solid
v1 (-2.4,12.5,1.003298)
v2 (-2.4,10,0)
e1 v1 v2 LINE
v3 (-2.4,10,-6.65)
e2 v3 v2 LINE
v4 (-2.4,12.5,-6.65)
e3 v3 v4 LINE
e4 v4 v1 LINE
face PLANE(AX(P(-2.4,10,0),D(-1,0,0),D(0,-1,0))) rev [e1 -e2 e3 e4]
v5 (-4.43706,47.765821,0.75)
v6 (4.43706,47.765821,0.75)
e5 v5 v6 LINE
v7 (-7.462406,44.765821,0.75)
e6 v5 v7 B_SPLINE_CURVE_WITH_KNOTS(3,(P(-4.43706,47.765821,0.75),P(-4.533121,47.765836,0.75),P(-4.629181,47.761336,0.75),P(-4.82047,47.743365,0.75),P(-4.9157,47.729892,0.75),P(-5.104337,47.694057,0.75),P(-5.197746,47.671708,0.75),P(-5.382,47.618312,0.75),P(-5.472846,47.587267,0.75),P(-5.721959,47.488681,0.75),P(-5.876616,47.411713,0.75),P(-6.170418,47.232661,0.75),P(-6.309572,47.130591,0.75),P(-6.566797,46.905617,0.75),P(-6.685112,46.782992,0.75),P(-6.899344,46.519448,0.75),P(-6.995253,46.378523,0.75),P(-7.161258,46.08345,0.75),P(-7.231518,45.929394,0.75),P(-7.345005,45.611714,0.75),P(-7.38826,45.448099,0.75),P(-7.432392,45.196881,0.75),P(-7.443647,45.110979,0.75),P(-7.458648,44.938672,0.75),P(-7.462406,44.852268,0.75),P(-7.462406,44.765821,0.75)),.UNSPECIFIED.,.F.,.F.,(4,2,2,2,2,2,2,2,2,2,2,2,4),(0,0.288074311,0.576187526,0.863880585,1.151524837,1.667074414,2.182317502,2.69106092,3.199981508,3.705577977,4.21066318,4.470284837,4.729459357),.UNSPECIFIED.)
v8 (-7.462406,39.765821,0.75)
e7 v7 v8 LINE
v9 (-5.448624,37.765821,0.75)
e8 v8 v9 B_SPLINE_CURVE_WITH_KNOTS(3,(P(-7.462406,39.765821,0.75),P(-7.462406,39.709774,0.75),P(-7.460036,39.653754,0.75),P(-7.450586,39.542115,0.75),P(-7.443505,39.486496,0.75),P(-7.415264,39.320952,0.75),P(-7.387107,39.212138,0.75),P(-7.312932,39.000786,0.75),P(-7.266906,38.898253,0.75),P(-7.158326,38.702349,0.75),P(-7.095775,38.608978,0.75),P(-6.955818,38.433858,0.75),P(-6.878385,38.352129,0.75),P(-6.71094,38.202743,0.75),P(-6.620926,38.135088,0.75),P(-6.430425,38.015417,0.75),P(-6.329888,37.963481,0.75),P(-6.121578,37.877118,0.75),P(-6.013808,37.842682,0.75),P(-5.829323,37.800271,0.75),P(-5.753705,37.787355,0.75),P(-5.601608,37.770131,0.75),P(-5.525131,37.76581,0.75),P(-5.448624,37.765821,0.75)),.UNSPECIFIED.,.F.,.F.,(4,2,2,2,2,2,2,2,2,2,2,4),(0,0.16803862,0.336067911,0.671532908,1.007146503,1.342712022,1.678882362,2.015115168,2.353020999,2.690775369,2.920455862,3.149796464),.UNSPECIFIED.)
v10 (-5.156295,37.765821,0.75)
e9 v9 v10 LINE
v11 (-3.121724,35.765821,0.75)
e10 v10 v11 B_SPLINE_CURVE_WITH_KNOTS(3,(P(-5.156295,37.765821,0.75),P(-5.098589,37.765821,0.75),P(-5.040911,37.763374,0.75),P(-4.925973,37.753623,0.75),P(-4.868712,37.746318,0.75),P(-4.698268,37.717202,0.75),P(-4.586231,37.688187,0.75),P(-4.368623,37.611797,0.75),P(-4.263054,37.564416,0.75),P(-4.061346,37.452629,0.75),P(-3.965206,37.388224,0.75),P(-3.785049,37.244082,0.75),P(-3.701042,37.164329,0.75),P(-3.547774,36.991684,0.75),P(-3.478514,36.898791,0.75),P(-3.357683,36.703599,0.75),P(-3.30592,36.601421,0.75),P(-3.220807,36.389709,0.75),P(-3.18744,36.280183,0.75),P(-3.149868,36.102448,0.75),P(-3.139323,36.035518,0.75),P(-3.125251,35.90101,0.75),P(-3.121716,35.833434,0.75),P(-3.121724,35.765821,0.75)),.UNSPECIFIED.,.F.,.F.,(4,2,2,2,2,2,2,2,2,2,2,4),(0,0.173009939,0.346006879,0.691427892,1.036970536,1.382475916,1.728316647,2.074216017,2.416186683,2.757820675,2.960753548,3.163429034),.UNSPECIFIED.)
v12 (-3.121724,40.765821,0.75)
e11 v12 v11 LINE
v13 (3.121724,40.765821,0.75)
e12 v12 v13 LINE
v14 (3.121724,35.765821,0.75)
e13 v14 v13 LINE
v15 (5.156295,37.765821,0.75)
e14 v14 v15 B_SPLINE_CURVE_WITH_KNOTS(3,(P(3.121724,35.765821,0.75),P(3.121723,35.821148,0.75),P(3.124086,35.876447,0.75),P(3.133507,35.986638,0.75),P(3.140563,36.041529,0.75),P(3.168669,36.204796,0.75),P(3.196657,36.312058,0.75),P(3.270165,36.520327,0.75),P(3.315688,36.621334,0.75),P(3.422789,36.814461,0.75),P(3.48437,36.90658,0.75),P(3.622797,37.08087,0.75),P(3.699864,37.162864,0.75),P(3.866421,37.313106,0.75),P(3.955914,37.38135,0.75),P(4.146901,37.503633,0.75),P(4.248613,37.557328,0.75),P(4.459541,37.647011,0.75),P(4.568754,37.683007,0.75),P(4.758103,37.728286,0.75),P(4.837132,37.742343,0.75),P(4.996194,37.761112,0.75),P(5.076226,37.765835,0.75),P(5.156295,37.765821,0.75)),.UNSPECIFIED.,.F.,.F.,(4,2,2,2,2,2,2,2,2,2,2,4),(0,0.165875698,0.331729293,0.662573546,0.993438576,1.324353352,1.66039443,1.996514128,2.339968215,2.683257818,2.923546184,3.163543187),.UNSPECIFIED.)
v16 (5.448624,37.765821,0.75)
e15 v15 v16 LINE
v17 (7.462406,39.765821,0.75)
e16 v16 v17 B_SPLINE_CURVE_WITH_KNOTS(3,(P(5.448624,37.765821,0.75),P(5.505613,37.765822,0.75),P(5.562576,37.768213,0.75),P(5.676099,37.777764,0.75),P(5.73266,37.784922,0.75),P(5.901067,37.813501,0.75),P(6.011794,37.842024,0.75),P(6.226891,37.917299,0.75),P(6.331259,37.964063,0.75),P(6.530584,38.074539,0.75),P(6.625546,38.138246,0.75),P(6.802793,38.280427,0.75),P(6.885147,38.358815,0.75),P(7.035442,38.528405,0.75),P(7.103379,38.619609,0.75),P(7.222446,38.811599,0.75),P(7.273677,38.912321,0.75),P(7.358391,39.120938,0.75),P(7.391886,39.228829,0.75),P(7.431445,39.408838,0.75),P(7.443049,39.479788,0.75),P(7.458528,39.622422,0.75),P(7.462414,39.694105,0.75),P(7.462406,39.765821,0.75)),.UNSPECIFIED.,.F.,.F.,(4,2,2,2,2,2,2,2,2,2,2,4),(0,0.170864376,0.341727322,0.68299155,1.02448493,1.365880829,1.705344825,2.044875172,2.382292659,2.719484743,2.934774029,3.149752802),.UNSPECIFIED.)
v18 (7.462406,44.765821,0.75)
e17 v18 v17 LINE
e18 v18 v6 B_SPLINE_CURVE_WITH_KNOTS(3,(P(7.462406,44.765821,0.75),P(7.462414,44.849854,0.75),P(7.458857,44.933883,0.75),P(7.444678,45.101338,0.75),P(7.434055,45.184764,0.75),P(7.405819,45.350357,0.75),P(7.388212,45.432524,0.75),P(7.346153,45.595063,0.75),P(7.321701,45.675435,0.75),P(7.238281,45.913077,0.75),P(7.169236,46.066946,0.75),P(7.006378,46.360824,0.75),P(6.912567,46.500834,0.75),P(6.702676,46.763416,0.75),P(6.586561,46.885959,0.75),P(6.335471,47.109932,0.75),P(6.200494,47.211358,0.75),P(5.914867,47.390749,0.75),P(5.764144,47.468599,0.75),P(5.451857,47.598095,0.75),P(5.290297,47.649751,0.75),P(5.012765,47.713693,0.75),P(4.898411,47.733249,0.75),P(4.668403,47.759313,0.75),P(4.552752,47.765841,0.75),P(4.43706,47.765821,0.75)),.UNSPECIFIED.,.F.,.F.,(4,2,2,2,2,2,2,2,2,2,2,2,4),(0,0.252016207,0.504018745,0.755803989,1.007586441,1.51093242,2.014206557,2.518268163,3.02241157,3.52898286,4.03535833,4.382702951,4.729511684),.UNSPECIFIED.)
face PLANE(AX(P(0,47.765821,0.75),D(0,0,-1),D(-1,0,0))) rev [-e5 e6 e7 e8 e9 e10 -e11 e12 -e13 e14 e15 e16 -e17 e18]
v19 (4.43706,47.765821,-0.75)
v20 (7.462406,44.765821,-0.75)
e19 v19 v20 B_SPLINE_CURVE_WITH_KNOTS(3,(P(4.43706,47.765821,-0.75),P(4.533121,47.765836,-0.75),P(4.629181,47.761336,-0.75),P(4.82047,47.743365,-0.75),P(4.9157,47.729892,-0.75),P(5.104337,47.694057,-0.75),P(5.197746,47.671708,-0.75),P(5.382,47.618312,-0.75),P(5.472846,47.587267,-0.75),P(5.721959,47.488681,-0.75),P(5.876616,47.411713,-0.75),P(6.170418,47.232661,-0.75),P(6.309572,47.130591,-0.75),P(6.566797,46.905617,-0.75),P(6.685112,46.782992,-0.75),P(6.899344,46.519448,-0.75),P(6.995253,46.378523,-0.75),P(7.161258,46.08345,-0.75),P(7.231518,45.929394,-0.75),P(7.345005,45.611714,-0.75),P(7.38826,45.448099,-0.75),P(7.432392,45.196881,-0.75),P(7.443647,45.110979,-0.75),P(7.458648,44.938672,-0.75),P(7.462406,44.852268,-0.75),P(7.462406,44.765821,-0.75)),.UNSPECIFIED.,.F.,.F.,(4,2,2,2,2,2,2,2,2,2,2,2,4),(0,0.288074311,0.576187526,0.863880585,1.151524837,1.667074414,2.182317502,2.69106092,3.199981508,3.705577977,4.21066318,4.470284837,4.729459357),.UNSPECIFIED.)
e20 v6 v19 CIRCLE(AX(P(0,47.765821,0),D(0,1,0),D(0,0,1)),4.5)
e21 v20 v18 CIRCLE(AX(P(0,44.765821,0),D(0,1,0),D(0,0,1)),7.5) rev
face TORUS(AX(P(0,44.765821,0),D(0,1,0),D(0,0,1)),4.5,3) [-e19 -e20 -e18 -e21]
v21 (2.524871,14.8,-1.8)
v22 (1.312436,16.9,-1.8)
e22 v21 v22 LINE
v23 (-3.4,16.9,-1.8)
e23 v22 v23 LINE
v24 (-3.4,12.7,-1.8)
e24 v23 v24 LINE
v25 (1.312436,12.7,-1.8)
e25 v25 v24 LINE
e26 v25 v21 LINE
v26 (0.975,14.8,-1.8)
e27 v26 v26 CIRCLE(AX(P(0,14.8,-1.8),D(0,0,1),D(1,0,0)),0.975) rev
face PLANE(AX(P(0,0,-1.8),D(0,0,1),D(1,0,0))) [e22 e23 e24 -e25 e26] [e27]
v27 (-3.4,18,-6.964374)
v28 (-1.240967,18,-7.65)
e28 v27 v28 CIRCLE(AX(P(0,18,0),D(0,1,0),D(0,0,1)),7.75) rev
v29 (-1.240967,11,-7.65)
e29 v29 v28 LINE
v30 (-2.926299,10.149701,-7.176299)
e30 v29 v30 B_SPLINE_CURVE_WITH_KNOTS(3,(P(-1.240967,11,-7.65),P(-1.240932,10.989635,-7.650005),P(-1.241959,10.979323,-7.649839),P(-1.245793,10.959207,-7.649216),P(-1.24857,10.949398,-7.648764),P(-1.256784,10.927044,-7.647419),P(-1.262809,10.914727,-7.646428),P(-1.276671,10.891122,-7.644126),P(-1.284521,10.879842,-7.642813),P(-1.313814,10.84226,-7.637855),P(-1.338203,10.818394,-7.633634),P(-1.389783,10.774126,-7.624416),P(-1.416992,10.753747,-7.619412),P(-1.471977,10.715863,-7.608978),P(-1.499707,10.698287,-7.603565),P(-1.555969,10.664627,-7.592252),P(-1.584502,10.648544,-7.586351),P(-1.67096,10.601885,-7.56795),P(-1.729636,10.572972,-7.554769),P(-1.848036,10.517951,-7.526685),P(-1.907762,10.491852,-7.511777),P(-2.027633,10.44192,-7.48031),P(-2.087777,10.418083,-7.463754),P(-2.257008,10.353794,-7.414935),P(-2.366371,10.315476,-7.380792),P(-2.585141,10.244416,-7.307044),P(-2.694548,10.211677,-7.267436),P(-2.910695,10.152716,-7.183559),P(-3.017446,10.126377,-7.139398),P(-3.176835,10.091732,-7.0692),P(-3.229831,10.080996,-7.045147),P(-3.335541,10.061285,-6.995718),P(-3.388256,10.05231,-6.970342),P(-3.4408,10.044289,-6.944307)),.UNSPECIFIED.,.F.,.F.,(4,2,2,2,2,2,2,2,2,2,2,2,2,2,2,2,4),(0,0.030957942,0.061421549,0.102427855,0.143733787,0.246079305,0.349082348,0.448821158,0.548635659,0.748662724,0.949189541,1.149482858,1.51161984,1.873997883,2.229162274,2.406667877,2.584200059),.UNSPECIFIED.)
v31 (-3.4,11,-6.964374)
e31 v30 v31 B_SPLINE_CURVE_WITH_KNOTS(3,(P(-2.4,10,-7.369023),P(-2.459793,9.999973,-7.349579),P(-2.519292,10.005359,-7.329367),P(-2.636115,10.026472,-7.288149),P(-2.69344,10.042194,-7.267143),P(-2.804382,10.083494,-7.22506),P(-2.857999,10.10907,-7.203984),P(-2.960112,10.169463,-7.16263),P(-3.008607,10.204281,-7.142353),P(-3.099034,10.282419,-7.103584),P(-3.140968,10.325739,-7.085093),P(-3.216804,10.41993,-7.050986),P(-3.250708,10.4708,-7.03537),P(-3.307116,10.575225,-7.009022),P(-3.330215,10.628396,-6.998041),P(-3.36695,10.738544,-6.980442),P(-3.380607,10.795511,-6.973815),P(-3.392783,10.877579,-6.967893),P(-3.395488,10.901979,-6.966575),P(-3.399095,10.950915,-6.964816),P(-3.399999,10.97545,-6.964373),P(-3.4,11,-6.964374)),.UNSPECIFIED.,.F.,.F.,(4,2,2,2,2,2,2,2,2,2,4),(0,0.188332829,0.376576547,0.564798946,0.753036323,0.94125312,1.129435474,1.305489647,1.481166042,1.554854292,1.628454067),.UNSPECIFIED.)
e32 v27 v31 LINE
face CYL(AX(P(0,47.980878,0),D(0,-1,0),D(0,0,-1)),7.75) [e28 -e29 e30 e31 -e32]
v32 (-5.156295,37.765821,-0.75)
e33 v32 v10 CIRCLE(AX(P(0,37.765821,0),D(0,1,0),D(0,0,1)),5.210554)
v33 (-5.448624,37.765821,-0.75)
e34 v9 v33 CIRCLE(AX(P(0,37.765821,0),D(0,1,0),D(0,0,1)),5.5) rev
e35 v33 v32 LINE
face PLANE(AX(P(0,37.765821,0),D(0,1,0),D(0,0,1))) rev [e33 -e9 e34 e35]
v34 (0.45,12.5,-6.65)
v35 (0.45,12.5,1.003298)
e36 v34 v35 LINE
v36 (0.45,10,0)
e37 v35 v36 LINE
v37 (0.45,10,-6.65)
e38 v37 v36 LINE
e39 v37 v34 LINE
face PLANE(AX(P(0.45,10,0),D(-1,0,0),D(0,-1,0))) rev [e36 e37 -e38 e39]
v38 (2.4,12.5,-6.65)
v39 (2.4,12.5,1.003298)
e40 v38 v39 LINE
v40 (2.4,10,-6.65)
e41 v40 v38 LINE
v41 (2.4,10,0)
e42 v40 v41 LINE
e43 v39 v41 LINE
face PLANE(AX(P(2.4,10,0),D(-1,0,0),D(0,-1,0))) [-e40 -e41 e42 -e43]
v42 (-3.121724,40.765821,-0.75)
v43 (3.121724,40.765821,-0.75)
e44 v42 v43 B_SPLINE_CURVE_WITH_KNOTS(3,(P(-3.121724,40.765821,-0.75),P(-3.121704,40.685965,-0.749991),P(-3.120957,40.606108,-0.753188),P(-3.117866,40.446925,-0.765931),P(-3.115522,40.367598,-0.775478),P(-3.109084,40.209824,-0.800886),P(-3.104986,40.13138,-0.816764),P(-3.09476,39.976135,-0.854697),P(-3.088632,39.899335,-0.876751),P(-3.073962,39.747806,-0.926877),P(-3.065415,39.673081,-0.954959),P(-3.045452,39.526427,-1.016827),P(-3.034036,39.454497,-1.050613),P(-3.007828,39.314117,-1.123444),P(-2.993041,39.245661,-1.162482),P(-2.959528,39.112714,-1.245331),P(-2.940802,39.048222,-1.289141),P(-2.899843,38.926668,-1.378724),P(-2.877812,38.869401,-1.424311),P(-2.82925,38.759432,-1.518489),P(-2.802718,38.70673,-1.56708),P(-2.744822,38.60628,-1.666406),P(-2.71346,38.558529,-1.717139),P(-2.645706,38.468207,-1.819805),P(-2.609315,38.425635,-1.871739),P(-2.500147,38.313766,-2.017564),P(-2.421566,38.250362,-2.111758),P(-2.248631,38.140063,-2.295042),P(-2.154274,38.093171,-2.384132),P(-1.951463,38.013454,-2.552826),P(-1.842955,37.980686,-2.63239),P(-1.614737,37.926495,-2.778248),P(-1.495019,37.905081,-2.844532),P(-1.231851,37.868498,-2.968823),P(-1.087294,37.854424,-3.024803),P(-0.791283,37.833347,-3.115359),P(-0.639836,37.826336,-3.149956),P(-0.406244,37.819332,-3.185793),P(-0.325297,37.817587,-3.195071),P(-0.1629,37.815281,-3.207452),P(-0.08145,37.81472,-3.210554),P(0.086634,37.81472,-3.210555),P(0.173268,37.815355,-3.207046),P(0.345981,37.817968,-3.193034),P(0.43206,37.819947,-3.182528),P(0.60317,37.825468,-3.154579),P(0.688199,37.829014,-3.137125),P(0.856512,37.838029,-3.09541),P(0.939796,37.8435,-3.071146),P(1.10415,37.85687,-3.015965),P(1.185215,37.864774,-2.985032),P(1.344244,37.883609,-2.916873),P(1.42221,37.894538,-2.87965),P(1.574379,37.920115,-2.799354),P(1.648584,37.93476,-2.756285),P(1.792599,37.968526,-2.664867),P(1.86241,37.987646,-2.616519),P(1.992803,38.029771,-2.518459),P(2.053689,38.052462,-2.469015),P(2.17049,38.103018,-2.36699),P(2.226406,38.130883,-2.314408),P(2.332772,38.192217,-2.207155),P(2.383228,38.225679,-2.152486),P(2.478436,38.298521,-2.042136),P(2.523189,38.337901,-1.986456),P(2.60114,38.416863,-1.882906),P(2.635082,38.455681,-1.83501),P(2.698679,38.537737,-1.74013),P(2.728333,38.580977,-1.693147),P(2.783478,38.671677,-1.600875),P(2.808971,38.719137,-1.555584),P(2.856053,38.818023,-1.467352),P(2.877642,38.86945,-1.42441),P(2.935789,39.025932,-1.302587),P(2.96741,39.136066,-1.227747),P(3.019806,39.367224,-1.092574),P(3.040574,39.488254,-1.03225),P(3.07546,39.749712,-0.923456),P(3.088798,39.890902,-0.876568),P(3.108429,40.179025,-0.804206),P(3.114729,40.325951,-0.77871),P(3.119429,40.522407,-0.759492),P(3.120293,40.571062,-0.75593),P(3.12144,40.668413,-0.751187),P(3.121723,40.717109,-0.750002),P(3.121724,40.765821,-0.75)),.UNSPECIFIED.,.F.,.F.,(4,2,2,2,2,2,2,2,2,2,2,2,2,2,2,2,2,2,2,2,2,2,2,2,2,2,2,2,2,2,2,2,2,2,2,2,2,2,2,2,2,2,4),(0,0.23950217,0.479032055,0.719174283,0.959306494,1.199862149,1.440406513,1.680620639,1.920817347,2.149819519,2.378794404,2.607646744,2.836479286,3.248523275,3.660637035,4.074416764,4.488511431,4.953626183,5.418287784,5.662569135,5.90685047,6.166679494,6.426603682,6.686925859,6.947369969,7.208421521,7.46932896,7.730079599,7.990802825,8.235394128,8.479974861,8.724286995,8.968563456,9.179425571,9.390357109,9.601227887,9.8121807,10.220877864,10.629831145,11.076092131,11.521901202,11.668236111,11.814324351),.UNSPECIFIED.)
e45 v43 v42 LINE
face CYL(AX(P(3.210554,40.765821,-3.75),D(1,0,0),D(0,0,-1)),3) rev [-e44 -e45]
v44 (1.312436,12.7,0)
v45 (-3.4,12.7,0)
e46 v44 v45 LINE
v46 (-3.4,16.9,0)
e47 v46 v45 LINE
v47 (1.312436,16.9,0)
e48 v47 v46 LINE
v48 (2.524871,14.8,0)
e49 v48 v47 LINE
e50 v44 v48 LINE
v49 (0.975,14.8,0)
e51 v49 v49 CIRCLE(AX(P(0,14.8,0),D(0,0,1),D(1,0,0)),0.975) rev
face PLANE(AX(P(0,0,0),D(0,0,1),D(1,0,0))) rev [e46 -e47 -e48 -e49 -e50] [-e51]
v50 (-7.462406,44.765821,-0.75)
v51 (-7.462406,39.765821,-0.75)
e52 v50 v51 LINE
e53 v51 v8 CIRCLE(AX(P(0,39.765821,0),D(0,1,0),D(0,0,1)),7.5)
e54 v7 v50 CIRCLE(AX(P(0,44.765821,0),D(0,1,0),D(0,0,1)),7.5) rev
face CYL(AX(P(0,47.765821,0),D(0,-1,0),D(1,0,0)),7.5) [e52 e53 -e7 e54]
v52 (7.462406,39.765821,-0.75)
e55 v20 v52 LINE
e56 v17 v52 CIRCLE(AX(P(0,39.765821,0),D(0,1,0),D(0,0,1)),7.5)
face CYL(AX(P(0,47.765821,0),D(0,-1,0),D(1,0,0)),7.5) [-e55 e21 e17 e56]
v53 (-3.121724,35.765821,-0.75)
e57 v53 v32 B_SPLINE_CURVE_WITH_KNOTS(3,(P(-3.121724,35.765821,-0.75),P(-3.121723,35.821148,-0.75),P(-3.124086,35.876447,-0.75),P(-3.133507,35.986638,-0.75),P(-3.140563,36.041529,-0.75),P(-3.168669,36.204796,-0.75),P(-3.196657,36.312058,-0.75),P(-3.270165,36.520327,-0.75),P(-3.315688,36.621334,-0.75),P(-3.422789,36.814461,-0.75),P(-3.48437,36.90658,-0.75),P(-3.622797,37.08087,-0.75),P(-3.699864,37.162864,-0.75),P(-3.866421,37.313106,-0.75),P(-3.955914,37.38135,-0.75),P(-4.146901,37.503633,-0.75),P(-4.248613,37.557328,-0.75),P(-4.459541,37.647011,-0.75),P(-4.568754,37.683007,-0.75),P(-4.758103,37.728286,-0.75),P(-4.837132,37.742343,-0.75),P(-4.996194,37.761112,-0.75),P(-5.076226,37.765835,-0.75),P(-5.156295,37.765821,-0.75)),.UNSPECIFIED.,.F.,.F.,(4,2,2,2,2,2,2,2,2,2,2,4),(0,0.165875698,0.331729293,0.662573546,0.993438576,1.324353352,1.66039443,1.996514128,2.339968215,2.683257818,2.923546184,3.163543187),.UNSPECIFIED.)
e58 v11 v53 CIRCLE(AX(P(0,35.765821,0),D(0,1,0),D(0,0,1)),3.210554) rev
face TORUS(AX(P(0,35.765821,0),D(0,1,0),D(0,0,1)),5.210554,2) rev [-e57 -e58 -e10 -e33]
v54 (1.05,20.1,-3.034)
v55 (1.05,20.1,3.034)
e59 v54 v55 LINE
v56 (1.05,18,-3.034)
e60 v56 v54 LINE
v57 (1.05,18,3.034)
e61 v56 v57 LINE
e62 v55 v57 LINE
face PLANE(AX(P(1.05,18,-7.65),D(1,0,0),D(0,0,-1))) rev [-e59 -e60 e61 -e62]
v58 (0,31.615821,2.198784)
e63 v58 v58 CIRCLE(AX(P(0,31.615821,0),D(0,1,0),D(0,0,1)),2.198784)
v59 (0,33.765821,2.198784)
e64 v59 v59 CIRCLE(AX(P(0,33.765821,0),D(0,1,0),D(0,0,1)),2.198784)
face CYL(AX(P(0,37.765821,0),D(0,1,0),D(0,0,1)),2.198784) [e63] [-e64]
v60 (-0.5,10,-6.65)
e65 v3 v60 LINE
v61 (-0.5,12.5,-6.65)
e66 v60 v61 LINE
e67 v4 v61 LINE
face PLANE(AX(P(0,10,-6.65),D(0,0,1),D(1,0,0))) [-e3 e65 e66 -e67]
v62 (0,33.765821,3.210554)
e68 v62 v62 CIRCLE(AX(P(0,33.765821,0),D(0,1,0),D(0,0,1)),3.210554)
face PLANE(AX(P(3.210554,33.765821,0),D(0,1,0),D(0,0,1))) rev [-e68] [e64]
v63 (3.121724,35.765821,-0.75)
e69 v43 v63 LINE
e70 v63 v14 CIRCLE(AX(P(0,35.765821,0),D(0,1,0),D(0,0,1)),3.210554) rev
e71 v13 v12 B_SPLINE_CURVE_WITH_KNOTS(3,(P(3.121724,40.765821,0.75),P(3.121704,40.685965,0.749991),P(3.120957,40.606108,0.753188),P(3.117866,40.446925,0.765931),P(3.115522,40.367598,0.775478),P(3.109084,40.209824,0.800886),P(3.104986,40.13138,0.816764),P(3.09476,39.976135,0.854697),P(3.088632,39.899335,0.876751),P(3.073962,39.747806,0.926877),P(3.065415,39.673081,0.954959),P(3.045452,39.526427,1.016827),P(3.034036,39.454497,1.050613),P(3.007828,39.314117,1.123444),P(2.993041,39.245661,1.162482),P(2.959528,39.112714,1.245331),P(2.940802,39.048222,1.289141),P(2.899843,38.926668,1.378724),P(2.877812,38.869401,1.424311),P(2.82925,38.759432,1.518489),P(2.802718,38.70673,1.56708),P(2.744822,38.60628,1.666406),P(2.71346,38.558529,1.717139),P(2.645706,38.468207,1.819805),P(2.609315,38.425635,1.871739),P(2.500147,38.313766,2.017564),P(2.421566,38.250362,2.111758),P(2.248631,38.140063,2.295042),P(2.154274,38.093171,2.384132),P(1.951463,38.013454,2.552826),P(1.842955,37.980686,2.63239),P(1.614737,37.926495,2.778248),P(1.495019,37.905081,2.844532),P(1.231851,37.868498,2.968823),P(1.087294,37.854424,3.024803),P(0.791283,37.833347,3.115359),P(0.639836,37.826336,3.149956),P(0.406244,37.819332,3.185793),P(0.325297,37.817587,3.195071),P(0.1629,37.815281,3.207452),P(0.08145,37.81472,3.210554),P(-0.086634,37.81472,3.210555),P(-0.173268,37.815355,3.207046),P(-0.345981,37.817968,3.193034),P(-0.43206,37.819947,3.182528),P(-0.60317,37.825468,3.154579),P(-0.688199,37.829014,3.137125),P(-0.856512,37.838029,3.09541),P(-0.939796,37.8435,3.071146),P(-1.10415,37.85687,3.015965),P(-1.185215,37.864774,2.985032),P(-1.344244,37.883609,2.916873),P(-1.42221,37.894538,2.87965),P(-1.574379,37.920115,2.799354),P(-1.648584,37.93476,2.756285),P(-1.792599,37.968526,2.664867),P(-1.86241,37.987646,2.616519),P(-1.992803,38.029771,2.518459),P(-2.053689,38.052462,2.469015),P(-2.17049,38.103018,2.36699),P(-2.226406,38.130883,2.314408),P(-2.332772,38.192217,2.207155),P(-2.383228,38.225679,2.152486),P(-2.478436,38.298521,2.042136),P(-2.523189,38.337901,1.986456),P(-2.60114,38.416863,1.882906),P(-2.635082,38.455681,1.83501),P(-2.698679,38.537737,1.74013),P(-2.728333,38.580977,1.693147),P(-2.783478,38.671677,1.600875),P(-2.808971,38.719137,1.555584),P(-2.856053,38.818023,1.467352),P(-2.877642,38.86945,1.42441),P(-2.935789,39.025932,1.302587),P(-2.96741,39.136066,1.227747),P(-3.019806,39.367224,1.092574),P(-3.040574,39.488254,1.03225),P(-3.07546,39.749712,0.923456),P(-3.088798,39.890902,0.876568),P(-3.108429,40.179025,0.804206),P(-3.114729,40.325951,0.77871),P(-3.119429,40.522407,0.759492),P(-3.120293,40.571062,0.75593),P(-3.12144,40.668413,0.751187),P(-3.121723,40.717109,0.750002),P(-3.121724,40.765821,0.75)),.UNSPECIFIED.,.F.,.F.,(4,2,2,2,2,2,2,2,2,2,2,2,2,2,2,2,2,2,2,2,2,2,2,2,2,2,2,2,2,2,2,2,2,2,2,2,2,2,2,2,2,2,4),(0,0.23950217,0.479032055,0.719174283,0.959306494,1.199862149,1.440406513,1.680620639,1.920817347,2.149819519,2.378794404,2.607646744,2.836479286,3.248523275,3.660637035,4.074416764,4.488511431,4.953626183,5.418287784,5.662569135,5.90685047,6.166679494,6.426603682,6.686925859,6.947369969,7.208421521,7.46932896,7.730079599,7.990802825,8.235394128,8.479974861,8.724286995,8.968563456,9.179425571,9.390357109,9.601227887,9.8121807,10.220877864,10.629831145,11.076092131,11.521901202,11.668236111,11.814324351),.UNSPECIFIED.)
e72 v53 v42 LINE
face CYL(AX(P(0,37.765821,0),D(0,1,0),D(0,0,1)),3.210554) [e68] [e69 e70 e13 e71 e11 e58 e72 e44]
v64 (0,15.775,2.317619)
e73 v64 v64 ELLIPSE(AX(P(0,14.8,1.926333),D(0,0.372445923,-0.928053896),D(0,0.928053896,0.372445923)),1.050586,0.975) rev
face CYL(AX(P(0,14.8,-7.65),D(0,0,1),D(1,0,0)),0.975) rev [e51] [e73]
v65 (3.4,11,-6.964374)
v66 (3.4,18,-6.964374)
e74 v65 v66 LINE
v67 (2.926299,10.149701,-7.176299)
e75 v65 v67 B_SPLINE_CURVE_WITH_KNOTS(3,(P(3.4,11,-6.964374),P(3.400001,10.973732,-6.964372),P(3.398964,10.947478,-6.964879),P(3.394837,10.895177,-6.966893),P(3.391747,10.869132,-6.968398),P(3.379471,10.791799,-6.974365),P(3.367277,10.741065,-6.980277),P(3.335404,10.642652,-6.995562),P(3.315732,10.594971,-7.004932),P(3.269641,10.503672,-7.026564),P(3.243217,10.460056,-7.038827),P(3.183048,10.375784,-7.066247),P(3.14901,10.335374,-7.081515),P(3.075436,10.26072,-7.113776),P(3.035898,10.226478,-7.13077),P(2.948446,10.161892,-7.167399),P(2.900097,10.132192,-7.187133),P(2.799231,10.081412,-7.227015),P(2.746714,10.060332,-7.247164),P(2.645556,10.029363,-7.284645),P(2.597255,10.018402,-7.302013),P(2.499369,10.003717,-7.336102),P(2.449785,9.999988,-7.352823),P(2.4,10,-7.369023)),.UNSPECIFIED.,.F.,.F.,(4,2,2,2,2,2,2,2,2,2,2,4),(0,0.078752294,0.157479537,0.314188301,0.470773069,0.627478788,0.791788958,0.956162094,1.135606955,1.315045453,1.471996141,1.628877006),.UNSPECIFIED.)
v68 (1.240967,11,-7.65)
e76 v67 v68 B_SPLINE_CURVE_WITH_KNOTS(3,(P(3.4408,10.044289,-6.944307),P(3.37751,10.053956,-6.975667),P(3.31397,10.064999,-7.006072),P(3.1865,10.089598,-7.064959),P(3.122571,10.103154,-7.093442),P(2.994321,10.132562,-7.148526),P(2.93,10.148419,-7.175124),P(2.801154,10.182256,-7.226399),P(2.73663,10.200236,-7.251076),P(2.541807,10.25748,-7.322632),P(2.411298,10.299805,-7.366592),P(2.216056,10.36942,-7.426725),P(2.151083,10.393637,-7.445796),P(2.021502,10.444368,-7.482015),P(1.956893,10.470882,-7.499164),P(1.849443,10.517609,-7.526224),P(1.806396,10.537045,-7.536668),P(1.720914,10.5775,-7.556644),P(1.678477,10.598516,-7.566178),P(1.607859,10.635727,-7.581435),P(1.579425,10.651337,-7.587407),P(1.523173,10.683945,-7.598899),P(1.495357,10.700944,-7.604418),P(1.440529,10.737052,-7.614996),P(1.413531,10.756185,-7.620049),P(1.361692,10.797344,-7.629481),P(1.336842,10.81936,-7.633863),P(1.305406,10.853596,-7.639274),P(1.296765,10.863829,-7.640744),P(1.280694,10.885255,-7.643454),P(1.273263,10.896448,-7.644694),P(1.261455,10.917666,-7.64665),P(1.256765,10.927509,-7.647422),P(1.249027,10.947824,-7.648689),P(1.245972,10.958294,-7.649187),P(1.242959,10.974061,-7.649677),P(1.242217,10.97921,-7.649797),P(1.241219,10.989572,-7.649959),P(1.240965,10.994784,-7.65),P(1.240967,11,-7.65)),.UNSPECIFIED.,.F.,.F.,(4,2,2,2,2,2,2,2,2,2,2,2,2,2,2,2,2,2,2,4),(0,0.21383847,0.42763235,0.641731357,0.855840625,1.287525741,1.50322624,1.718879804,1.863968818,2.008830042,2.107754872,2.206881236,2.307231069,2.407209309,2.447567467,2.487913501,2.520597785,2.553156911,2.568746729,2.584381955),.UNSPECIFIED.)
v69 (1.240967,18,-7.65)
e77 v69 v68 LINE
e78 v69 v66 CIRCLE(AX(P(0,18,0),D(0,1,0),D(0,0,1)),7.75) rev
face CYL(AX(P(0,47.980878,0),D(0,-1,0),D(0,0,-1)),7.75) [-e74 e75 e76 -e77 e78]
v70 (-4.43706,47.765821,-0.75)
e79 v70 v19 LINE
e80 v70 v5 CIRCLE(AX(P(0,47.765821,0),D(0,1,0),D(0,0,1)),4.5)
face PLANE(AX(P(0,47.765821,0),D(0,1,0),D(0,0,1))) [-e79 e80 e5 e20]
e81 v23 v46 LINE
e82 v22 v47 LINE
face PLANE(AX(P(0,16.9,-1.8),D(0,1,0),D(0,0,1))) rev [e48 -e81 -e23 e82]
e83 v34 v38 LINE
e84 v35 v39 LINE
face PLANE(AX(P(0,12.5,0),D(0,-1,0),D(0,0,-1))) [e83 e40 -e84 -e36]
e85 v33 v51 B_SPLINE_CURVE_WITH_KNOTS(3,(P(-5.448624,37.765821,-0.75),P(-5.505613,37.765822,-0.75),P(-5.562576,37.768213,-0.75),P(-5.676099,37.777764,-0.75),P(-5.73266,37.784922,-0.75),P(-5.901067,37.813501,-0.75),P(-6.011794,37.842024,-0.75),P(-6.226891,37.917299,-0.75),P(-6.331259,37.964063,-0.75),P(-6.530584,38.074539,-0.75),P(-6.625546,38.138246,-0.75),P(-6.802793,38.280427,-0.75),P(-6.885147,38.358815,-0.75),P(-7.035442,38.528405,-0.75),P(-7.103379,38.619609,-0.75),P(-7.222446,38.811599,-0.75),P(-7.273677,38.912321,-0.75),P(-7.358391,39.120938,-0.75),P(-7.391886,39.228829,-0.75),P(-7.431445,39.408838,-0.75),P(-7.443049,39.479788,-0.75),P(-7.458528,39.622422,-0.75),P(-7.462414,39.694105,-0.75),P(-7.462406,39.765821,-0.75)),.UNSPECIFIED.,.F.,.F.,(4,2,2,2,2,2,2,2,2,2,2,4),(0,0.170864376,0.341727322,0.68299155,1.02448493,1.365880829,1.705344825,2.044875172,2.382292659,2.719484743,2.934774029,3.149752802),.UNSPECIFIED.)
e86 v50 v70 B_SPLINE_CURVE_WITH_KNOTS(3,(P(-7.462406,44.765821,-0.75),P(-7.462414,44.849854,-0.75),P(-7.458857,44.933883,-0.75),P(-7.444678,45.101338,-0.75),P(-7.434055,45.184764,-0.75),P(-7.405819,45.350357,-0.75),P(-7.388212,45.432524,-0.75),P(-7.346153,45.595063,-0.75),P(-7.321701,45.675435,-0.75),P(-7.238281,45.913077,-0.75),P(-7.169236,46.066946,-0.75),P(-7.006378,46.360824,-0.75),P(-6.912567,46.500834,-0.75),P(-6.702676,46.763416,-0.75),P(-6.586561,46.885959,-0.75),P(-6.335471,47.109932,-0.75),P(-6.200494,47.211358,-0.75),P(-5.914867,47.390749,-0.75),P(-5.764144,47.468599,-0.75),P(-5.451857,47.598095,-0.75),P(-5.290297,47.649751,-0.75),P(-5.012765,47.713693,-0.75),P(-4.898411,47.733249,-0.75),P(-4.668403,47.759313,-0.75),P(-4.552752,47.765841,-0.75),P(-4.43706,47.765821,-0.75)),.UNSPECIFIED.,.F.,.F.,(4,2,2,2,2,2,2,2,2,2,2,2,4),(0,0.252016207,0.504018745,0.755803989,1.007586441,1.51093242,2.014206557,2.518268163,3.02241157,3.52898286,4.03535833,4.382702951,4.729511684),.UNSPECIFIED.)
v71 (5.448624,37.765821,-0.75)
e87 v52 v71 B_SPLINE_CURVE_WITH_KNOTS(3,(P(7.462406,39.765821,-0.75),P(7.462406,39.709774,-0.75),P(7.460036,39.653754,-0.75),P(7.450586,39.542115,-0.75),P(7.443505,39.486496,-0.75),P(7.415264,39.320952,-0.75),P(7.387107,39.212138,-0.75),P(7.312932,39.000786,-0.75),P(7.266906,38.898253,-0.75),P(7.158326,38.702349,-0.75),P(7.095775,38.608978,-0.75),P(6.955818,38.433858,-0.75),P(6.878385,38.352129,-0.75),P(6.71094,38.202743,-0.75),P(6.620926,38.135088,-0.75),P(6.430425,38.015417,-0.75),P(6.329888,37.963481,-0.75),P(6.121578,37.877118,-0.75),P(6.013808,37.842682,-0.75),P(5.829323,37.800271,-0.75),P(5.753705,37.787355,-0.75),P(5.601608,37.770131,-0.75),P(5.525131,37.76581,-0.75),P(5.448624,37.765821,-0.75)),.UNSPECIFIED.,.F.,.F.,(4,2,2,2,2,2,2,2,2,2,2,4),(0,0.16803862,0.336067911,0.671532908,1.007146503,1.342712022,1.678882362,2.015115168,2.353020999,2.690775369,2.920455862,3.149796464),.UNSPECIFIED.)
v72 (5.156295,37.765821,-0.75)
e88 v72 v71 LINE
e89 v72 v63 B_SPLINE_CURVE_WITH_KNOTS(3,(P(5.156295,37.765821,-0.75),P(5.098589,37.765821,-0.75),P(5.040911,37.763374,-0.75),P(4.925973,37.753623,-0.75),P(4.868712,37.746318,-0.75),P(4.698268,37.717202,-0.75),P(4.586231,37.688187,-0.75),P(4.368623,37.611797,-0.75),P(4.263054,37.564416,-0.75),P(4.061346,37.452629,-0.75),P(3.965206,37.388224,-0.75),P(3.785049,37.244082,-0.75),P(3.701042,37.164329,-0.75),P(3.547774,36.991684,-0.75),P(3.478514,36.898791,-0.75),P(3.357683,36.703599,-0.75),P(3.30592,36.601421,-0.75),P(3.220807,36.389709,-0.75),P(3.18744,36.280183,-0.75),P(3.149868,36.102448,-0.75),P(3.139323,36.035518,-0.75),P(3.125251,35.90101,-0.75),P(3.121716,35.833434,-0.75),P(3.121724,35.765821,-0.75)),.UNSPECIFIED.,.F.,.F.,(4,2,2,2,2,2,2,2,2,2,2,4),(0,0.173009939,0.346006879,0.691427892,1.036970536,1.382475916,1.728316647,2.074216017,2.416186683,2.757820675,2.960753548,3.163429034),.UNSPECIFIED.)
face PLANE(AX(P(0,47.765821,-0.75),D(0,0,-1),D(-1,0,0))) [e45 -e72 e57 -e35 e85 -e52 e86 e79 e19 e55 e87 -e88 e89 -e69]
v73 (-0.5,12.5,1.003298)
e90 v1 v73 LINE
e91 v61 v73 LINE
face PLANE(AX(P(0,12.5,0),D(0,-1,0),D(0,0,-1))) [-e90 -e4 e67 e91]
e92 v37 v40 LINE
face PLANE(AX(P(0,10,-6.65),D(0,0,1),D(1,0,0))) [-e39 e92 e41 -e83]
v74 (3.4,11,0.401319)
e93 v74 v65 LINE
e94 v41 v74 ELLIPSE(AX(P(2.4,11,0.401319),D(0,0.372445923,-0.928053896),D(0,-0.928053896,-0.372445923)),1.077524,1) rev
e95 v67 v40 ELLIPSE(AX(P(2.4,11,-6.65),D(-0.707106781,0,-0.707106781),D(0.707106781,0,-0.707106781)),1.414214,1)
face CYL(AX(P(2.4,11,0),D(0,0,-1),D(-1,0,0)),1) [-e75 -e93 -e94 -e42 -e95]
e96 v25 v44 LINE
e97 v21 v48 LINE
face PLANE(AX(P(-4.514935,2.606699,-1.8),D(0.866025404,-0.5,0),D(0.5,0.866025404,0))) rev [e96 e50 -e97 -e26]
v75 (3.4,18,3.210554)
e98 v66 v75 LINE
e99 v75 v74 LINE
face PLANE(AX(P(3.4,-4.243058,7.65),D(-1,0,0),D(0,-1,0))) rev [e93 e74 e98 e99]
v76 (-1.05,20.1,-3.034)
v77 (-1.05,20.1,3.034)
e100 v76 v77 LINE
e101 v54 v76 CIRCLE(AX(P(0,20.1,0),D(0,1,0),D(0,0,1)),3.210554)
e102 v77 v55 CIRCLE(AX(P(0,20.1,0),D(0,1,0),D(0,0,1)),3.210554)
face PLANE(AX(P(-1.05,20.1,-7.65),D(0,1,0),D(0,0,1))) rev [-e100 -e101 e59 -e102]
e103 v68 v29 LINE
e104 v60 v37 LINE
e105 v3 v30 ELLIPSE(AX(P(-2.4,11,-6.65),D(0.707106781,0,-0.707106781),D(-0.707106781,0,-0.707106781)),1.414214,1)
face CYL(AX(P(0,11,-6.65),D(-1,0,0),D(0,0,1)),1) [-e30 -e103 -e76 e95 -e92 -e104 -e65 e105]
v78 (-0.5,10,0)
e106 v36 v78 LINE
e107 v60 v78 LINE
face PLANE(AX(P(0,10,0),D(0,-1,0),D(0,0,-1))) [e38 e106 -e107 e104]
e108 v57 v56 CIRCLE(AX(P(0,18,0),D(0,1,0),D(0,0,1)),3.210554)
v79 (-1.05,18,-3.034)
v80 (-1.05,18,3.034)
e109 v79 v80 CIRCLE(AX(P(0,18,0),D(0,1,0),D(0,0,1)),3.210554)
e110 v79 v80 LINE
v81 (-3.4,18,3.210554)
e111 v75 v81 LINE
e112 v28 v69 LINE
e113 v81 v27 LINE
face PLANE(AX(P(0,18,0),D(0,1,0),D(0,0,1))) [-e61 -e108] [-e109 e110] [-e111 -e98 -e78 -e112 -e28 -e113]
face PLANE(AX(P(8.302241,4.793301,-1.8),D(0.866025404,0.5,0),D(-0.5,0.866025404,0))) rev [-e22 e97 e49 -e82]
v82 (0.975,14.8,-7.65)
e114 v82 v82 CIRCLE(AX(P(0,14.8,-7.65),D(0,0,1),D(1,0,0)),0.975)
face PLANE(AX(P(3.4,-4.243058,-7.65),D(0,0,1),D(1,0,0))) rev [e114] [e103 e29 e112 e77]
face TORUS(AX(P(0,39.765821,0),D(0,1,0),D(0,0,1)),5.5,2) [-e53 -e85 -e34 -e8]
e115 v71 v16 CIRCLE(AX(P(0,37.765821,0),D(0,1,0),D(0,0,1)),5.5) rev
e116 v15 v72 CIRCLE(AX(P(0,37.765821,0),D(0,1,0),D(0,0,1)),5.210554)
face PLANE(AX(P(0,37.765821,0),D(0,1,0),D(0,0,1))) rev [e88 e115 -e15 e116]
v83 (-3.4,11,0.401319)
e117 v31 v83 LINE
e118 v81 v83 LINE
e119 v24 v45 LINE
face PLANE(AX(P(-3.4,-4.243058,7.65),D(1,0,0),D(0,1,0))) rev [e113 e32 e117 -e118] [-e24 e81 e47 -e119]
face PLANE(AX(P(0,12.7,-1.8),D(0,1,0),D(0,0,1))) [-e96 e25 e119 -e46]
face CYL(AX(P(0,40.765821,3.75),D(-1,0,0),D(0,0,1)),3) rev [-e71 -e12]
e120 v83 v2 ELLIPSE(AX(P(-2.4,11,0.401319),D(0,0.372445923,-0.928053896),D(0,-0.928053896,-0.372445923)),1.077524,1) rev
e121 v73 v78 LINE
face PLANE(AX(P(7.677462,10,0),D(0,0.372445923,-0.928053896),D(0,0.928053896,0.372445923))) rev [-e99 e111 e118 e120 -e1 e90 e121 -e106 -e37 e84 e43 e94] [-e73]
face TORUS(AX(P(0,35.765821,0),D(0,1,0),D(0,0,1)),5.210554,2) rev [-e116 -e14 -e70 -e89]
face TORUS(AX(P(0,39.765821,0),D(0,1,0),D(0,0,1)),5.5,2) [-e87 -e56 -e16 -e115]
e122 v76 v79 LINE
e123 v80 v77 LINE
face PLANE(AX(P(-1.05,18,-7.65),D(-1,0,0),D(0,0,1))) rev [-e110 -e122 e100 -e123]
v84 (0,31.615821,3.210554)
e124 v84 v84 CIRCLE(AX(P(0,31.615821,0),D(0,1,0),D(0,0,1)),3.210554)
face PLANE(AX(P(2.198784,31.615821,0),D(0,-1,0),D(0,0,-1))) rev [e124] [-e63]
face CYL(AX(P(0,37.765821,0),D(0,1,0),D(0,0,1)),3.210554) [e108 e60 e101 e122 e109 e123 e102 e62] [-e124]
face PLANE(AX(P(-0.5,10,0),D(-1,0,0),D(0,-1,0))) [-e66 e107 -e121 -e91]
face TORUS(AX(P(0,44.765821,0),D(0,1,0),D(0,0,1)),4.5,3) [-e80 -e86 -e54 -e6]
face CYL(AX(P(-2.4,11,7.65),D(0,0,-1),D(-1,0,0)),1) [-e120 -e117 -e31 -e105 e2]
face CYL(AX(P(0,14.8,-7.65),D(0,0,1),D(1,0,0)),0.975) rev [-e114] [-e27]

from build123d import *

# Parameters (mm, degrees)
BOSS_EXTRUDE1_DEPTH = 10
FILLET2_R           = 2
FILLET3_R           = 3
BOSS_EXTRUDE3_START = 5.5
SKETCH5_W           = 6.8
SKETCH5_H           = 15.3
SKETCH5_W_2         = 1.95
SKETCH5_H_2         = 13.3
SKETCH5_W_3         = 1.9
BOSS_EXTRUDE3_DEPTH = 2.5
SKETCH7_W           = 6.8
SKETCH7_H           = 15.3
BOSS_EXTRUDE4_DEPTH = 5.5
FILLET7_START       = -3.4
FILLET7_DEPTH       = 6.8
FILLET7_START_2     = -9
FILLET7_2_DEPTH     = 18
SKETCH8_R           = 0.975
CUT_EXTRUDE2_DEPTH  = 51.714038513
CUT_EXTRUDE4_DEPTH  = 50.587359306
CUT_EXTRUDE5_DEPTH  = 1.8
SKETCH14_R          = 1.95
CUT_EXTRUDE6_DEPTH  = 3.5
SKETCH17_W          = 2.1
SKETCH17_H          = 2.1
CUT_EXTRUDE8_DEPTH  = 51.714038513
BOSS_EXTRUDE5_START = -15.3
SKETCH18_W          = 1.9
SKETCH18_H          = 2
BOSS_EXTRUDE5_DEPTH = 15.3
SKETCH19_W          = 1.9
SKETCH19_H          = 0.1
CUT_EXTRUDE9_DEPTH  = 10.87055
SKETCH20_R          = 1.9
SKETCH20_R_2        = 1.075
BOSS_EXTRUDE6_DEPTH = 1.5
SKETCH21_R          = 12.317587445
SKETCH21_R_2        = 7.75
CUT_EXTRUDE10_DEPTH = 49.952489235


with BuildPart() as part:
    # Sketch1 → Revolve1 (revolve)
    with BuildSketch(Plane.XY, mode=Mode.PRIVATE) as revolve1_sk:
        Polygon((3.210554255, 37.765821371), (3.210554255, 33.765821371), (2.198784107, 33.765821371), (2.198784107, 31.615821371), (3.210554255, 31.615821371), (3.210554255, 18), (0, 18), (0, 37.765821371), align=None)
    revolve(revolve1_sk.sketch.rotate(Axis((0, 37.765821371, 0), (0, -1, 0)), 90), axis=Axis((0, 37.765821371, 0), (0, -1, 0)))

    # Sketch2 → Boss-Extrude1 (add)
    with BuildSketch(Plane(origin=(0, 37.765821371, 0), x_dir=(1, 0, 0), z_dir=(0, 1, 0))):
        with BuildLine():
            Line((3.121723662, 0.75), (-3.121723662, 0.75))
            ThreePointArc((-3.121723662, 0.75), (-3.210554255, 0), (-3.121723662, -0.75))
            Line((-3.121723662, -0.75), (3.121723662, -0.75))
            ThreePointArc((3.121723662, -0.75), (3.188269265, -0.377621131), (3.210554255, 0))
            ThreePointArc((3.210554255, 0), (3.188269265, 0.377621131), (3.121723662, 0.75))
        make_face()
        with BuildLine():
            Line((-3.121723662, 0.75), (-7.462405778, 0.75))
            ThreePointArc((-7.462405778, 0.75), (-7.5, 0), (-7.462405778, -0.75))
            Line((-7.462405778, -0.75), (-3.121723662, -0.75))
            ThreePointArc((-3.121723662, -0.75), (-3.210554255, 0), (-3.121723662, 0.75))
        make_face()
        with BuildLine():
            ThreePointArc((7.5, 0), (7.490595548, 0.375470813), (7.462405778, 0.75))
            Line((7.462405778, 0.75), (3.121723662, 0.75))
            ThreePointArc((3.121723662, 0.75), (3.188269265, 0.377621131), (3.210554255, 0))
            ThreePointArc((3.210554255, 0), (3.188269265, -0.377621131), (3.121723662, -0.75))
            Line((3.121723662, -0.75), (7.462405778, -0.75))
            ThreePointArc((7.462405778, -0.75), (7.490595548, -0.375470813), (7.5, 0))
        make_face()
    extrude(amount=BOSS_EXTRUDE1_DEPTH)

    # Fillet2
    # the kernel refuses this fillet: 2 mm, written as the material it adds along each edge
    with BuildSketch(Plane(origin=(0, 37.765821371, 0), x_dir=(0.2205776552735497, 0, 0.9753694161670351), z_dir=(0.9753694161670351, 0, -0.2205776552735497))) as fillet2_piece_1_section:
        with BuildLine():
            CenterArc((3.210554255 + FILLET2_R, FILLET2_R), FILLET2_R, 180, 90)
            Line((3.210554255 + FILLET2_R, 0), (3.210554255, 0))
            Line((3.210554255, 0), (3.210554255, FILLET2_R))
        make_face()
    fillet2_piece_1 = revolve(axis=Axis((0, 37.765821371, 0), (0, -1, 0)), revolution_arc=205.485927446, mode=Mode.PRIVATE)
    fillet2_piece_1 = split(fillet2_piece_1, bisect_by=Plane(origin=(0, 37.765821371, 0.75), z_dir=(0, 0, -1)), keep=Keep.TOP, mode=Mode.PRIVATE)
    fillet2_piece_1 = split(fillet2_piece_1, bisect_by=Plane(origin=(0, 37.765821371, -0.75), z_dir=(0, 0, 1)), keep=Keep.TOP, mode=Mode.PRIVATE)
    add(fillet2_piece_1)
    with BuildSketch(Plane(origin=(0, 37.765821371, 0), x_dir=(-0.22057765527352385, 0, -0.9753694161670411), z_dir=(-0.9753694161670411, 0, 0.22057765527352385))) as fillet2_piece_2_section:
        with BuildLine():
            CenterArc((3.210554255 + FILLET2_R, FILLET2_R), FILLET2_R, 180, 90)
            Line((3.210554255 + FILLET2_R, 0), (3.210554255, 0))
            Line((3.210554255, 0), (3.210554255, FILLET2_R))
        make_face()
    fillet2_piece_2 = revolve(axis=Axis((0, 37.765821371, 0), (0, -1, 0)), revolution_arc=205.485927446, mode=Mode.PRIVATE)
    fillet2_piece_2 = split(fillet2_piece_2, bisect_by=Plane(origin=(0, 37.765821371, 0.75), z_dir=(0, 0, -1)), keep=Keep.TOP, mode=Mode.PRIVATE)
    fillet2_piece_2 = split(fillet2_piece_2, bisect_by=Plane(origin=(0, 37.765821371, -0.75), z_dir=(0, 0, 1)), keep=Keep.TOP, mode=Mode.PRIVATE)
    add(fillet2_piece_2)
    # the kernel refuses this fillet: 2 mm, written as the material it takes off along each edge
    with BuildSketch(Plane(origin=(0, 37.765821371, 0), x_dir=(-0.7201079494948177, 0, -0.6938620475817721), z_dir=(0.6938620475817721, 0, -0.7201079494948177))) as fillet2_2_piece_1:
        with BuildLine():
            CenterArc((7.5 - FILLET2_R, FILLET2_R), FILLET2_R, 270, 90)
            Line((7.5, FILLET2_R), (7.5, 0))
            Line((7.5, 0), (7.5 - FILLET2_R, 0))
        make_face()
    revolve(axis=Axis((0, 37.765821371, 0), (0, 1, 0)), revolution_arc=87.873212667, mode=Mode.SUBTRACT)
    with BuildSketch(Plane(origin=(0, 37.765821371, 0), x_dir=(0.7201079494948216, 0, 0.6938620475817678), z_dir=(-0.6938620475817678, 0, 0.7201079494948216))) as fillet2_2_piece_2:
        with BuildLine():
            CenterArc((7.5 - FILLET2_R, FILLET2_R), FILLET2_R, 270, 90)
            Line((7.5, FILLET2_R), (7.5, 0))
            Line((7.5, 0), (7.5 - FILLET2_R, 0))
        make_face()
    revolve(axis=Axis((0, 37.765821371, 0), (0, 1, 0)), revolution_arc=87.873212667, mode=Mode.SUBTRACT)

    # Fillet3
    # the kernel refuses this fillet: 3 mm, written as the material it adds along each edge
    with BuildSketch(Plane(origin=(10.621723662, 37.765821371, -0.75), x_dir=(0, 1, 0), z_dir=(-1, 0, 0))) as fillet3_piece_1_section:
        with BuildLine():
            CenterArc((FILLET3_R, FILLET3_R), FILLET3_R, 180, 90)
            Line((0, FILLET3_R), (0, 0))
            Line((0, 0), (FILLET3_R, 0))
        make_face()
    fillet3_piece_1 = extrude(amount=21.243447325, mode=Mode.PRIVATE)
    fillet3_piece_1 = fillet3_piece_1 & Plane(origin=(0, 37.765821371, 0), x_dir=(0, 0, 1), z_dir=(0, -1, 0)) * Cylinder(3.210554255, 55, mode=Mode.PRIVATE)
    add(fillet3_piece_1)
    with BuildSketch(Plane(origin=(10.621723662, 37.765821371, 0.75), x_dir=(0, 1, 0), z_dir=(-1, 0, 0))) as fillet3_piece_2_section:
        with BuildLine():
            CenterArc((FILLET3_R, -FILLET3_R), FILLET3_R, 90, 90)
            Line((0, -FILLET3_R), (0, 0))
            Line((0, 0), (FILLET3_R, 0))
        make_face()
    fillet3_piece_2 = extrude(amount=21.243447325, mode=Mode.PRIVATE)
    fillet3_piece_2 = fillet3_piece_2 & Plane(origin=(0, 37.765821371, 0), x_dir=(0, 0, 1), z_dir=(0, -1, 0)) * Cylinder(3.210554255, 55, mode=Mode.PRIVATE)
    add(fillet3_piece_2)
    # the kernel refuses this fillet: 3 mm, written as the material it takes off along each edge
    with BuildSketch(Plane(origin=(0, 47.765821371, 0), x_dir=(-0.45344108598997085, 0, -0.891286251176487), z_dir=(0.891286251176487, 0, -0.45344108598997085))) as fillet3_2_piece_1:
        with BuildLine():
            CenterArc((7.5 - FILLET3_R, -FILLET3_R), FILLET3_R, 360, 90)
            Line((7.5 - FILLET3_R, 0), (7.5, 0))
            Line((7.5, 0), (7.5, -FILLET3_R))
        make_face()
    revolve(axis=Axis((0, 47.765821371, 0), (0, 1, 0)), revolution_arc=126.070648523, mode=Mode.SUBTRACT)
    with BuildSketch(Plane(origin=(0, 47.765821371, 0), x_dir=(0.4534410859901425, 0, -0.8912862511763997), z_dir=(-0.8912862511763997, 0, -0.4534410859901425))) as fillet3_2_piece_2:
        with BuildLine():
            CenterArc((7.5 - FILLET3_R, FILLET3_R), FILLET3_R, 270, 90)
            Line((7.5, FILLET3_R), (7.5, 0))
            Line((7.5, 0), (7.5 - FILLET3_R, 0))
        make_face()
    revolve(axis=Axis((0, 47.765821371, 0), (0, -1, 0)), revolution_arc=126.070648523, mode=Mode.SUBTRACT)



with BuildPart() as body_2:
    # Sketch5 → Boss-Extrude3 (new body)
    with BuildSketch(Plane.XZ.offset(-18).offset(BOSS_EXTRUDE3_START)):
        Rectangle(SKETCH5_W, SKETCH5_H)
        with Locations((1.425, 0)):
            Rectangle(SKETCH5_W_2, SKETCH5_H_2, mode=Mode.SUBTRACT)
        with Locations((-1.45, 0)):
            Rectangle(SKETCH5_W_3, SKETCH5_H_2, mode=Mode.SUBTRACT)
    extrude(amount=BOSS_EXTRUDE3_DEPTH)


with BuildPart() as part_1:
    add(part.part)

    add(body_2.part)  # Boss-Extrude4 merges body 2
    # Sketch7 → Boss-Extrude4 (add)
    with BuildSketch(Plane.XZ.offset(-18)):
        Rectangle(SKETCH7_W, SKETCH7_H)
    extrude(amount=BOSS_EXTRUDE4_DEPTH)

    # Fillet7: read off the stored shape, not the designer's step
    # Fillet7 outline → Fillet7 (cut)
    with BuildSketch(Plane.YZ.offset(FILLET7_START)):
        with BuildLine():
            Line((10, 7.65), (10, 6.65))
            ThreePointArc((10, 6.65), (10.292893219, 7.357106781), (11, 7.65))
            Line((11, 7.65), (10, 7.65))
        make_face()
        with BuildLine():
            ThreePointArc((11, -7.65), (10.292893219, -7.357106781), (10, -6.65))
            Line((10, -6.65), (10, -7.65))
            Line((10, -7.65), (11, -7.65))
        make_face()
    extrude(amount=FILLET7_DEPTH, mode=Mode.SUBTRACT)

    # Fillet7 2 outline → Fillet7 2 (cut)
    with BuildSketch(Plane.XY.offset(FILLET7_START_2)):
        with BuildLine():
            Line((-3.4, 10), (-2.4, 10))
            ThreePointArc((-2.4, 10), (-3.107106781, 10.292893219), (-3.4, 11))
            Line((-3.4, 11), (-3.4, 10))
        make_face()
        with BuildLine():
            Line((3.4, 10), (3.4, 11))
            ThreePointArc((3.4, 11), (3.107106781, 10.292893219), (2.4, 10))
            Line((2.4, 10), (3.4, 10))
        make_face()
    extrude(amount=FILLET7_2_DEPTH, mode=Mode.SUBTRACT)

    # Sketch8 → Cut-Extrude2 (cut, through all)
    with BuildSketch(Plane.XY.offset(7.65)):
        with Locations((0, 14.8)):
            Circle(SKETCH8_R)
    extrude(amount=-CUT_EXTRUDE2_DEPTH, mode=Mode.SUBTRACT)

    # Sketch11 → Cut-Extrude4 (cut, through all)
    with BuildSketch(Plane.ZY.offset(3.4)):
        Polygon((3.220554255, 18), (1, 10), (0, 10), (3.210554255, 18), align=None)
    extrude(amount=-CUT_EXTRUDE4_DEPTH, mode=Mode.SUBTRACT)


with BuildPart() as cut_extrude4_piece_1:
    # of the separate pieces the step leaves, piece 1, a body of its own (cut_extrude4_pieces)
    add(part_1.part.solids().sort_by_distance((3.4, 11, -7.65))[0])

    # Sketch13 → Cut-Extrude5 (cut)
    with BuildSketch(Plane.XY):
        with BuildLine():
            Line((-1.112435565, 12.7), (0, 12.7))
            ThreePointArc((0, 12.7), (2.1, 14.8), (0, 16.9))
            Line((0, 16.9), (-1.112435565, 16.9))
            Line((-1.112435565, 16.9), (-2.324871131, 14.8))
            Line((-2.324871131, 14.8), (-1.112435565, 12.7))
        make_face()
        with BuildLine():
            ThreePointArc((0, 16.9), (2.1, 14.8), (0, 12.7))
            Line((0, 12.7), (1.312435565, 12.7))
            Line((1.312435565, 12.7), (2.524871131, 14.8))
            Line((2.524871131, 14.8), (1.312435565, 16.9))
            Line((1.312435565, 16.9), (0, 16.9))
        make_face()
        with BuildLine():
            Line((-6.8, 12.7), (-1.112435565, 12.7))
            Line((-1.112435565, 12.7), (-2.324871131, 14.8))
            Line((-2.324871131, 14.8), (-1.112435565, 16.9))
            Line((-1.112435565, 16.9), (-6.8, 16.9))
            ThreePointArc((-6.8, 16.9), (-8.9, 14.8), (-6.8, 12.7))
        make_face()
    extrude(amount=-CUT_EXTRUDE5_DEPTH, mode=Mode.SUBTRACT)

    # Sketch17 → Cut-Extrude8 (cut, through all)
    with BuildSketch(Plane.XY.offset(7.65)):
        with Locations((0, 19.05)):
            Rectangle(SKETCH17_W, SKETCH17_H)
    extrude(amount=-CUT_EXTRUDE8_DEPTH, mode=Mode.SUBTRACT)


with BuildPart() as cut_extrude4_piece_2:
    # of the separate pieces the step leaves, piece 2, a body of its own (cut_extrude4_pieces)
    add(part_1.part.solids().sort_by_distance((3.4, 11, 7.65))[0])

    # Sketch14 → Cut-Extrude6 (cut)
    with BuildSketch(Plane.XY.offset(7.65)):
        with Locations((0, 14.8)):
            Circle(SKETCH14_R)
    extrude(amount=-CUT_EXTRUDE6_DEPTH, mode=Mode.SUBTRACT)

    # Sketch18 → Boss-Extrude5 (add)
    with BuildSketch(Plane.XY.offset(7.65).offset(BOSS_EXTRUDE5_START)):
        with Locations((0, 19)):
            Rectangle(SKETCH18_W, SKETCH18_H)
    extrude(amount=BOSS_EXTRUDE5_DEPTH)

    # Sketch19 → Cut-Extrude9 (cut)
    with BuildSketch(Plane(origin=(0, 0, -7.65), x_dir=(-1, 0, 0), z_dir=(0, 0, -1))):
        with Locations((0, 18.05)):
            Rectangle(SKETCH19_W, SKETCH19_H)
    extrude(amount=-CUT_EXTRUDE9_DEPTH, mode=Mode.SUBTRACT)


with BuildPart() as body_3:
    # Sketch20 → Boss-Extrude6 (new body)
    with BuildSketch(Plane.XY.offset(7.65)):
        with Locations((0, 14.8)):
            Circle(SKETCH20_R)
        with Locations((0, 14.8)):
            Circle(SKETCH20_R_2, mode=Mode.SUBTRACT)
    extrude(amount=-BOSS_EXTRUDE6_DEPTH)


with BuildPart() as cut_extrude10_tool:
    # Sketch21 → Cut-Extrude10 (new, through all)
    with BuildSketch(Plane(origin=(0, 0, 0), x_dir=(1, 0, 0), z_dir=(0, 1, 0))):
        Circle(SKETCH21_R)
        Circle(SKETCH21_R_2, mode=Mode.SUBTRACT)
    extrude(amount=CUT_EXTRUDE10_DEPTH)


with BuildPart() as cut_extrude4_piece_1_1:
    add(cut_extrude4_piece_1.part)

    # Cut-Extrude10: cut by cut_extrude10_tool
    add(cut_extrude10_tool.part, mode=Mode.SUBTRACT)


with BuildPart() as cut_extrude4_piece_2_1:
    add(cut_extrude4_piece_2.part)

    # Cut-Extrude10: cut by cut_extrude10_tool
    add(cut_extrude10_tool.part, mode=Mode.SUBTRACT)


with BuildPart() as body_3_1:
    add(body_3.part)

    # Cut-Extrude10: cut by cut_extrude10_tool
    add(cut_extrude10_tool.part, mode=Mode.SUBTRACT)


solid = cut_extrude4_piece_1_1.part
